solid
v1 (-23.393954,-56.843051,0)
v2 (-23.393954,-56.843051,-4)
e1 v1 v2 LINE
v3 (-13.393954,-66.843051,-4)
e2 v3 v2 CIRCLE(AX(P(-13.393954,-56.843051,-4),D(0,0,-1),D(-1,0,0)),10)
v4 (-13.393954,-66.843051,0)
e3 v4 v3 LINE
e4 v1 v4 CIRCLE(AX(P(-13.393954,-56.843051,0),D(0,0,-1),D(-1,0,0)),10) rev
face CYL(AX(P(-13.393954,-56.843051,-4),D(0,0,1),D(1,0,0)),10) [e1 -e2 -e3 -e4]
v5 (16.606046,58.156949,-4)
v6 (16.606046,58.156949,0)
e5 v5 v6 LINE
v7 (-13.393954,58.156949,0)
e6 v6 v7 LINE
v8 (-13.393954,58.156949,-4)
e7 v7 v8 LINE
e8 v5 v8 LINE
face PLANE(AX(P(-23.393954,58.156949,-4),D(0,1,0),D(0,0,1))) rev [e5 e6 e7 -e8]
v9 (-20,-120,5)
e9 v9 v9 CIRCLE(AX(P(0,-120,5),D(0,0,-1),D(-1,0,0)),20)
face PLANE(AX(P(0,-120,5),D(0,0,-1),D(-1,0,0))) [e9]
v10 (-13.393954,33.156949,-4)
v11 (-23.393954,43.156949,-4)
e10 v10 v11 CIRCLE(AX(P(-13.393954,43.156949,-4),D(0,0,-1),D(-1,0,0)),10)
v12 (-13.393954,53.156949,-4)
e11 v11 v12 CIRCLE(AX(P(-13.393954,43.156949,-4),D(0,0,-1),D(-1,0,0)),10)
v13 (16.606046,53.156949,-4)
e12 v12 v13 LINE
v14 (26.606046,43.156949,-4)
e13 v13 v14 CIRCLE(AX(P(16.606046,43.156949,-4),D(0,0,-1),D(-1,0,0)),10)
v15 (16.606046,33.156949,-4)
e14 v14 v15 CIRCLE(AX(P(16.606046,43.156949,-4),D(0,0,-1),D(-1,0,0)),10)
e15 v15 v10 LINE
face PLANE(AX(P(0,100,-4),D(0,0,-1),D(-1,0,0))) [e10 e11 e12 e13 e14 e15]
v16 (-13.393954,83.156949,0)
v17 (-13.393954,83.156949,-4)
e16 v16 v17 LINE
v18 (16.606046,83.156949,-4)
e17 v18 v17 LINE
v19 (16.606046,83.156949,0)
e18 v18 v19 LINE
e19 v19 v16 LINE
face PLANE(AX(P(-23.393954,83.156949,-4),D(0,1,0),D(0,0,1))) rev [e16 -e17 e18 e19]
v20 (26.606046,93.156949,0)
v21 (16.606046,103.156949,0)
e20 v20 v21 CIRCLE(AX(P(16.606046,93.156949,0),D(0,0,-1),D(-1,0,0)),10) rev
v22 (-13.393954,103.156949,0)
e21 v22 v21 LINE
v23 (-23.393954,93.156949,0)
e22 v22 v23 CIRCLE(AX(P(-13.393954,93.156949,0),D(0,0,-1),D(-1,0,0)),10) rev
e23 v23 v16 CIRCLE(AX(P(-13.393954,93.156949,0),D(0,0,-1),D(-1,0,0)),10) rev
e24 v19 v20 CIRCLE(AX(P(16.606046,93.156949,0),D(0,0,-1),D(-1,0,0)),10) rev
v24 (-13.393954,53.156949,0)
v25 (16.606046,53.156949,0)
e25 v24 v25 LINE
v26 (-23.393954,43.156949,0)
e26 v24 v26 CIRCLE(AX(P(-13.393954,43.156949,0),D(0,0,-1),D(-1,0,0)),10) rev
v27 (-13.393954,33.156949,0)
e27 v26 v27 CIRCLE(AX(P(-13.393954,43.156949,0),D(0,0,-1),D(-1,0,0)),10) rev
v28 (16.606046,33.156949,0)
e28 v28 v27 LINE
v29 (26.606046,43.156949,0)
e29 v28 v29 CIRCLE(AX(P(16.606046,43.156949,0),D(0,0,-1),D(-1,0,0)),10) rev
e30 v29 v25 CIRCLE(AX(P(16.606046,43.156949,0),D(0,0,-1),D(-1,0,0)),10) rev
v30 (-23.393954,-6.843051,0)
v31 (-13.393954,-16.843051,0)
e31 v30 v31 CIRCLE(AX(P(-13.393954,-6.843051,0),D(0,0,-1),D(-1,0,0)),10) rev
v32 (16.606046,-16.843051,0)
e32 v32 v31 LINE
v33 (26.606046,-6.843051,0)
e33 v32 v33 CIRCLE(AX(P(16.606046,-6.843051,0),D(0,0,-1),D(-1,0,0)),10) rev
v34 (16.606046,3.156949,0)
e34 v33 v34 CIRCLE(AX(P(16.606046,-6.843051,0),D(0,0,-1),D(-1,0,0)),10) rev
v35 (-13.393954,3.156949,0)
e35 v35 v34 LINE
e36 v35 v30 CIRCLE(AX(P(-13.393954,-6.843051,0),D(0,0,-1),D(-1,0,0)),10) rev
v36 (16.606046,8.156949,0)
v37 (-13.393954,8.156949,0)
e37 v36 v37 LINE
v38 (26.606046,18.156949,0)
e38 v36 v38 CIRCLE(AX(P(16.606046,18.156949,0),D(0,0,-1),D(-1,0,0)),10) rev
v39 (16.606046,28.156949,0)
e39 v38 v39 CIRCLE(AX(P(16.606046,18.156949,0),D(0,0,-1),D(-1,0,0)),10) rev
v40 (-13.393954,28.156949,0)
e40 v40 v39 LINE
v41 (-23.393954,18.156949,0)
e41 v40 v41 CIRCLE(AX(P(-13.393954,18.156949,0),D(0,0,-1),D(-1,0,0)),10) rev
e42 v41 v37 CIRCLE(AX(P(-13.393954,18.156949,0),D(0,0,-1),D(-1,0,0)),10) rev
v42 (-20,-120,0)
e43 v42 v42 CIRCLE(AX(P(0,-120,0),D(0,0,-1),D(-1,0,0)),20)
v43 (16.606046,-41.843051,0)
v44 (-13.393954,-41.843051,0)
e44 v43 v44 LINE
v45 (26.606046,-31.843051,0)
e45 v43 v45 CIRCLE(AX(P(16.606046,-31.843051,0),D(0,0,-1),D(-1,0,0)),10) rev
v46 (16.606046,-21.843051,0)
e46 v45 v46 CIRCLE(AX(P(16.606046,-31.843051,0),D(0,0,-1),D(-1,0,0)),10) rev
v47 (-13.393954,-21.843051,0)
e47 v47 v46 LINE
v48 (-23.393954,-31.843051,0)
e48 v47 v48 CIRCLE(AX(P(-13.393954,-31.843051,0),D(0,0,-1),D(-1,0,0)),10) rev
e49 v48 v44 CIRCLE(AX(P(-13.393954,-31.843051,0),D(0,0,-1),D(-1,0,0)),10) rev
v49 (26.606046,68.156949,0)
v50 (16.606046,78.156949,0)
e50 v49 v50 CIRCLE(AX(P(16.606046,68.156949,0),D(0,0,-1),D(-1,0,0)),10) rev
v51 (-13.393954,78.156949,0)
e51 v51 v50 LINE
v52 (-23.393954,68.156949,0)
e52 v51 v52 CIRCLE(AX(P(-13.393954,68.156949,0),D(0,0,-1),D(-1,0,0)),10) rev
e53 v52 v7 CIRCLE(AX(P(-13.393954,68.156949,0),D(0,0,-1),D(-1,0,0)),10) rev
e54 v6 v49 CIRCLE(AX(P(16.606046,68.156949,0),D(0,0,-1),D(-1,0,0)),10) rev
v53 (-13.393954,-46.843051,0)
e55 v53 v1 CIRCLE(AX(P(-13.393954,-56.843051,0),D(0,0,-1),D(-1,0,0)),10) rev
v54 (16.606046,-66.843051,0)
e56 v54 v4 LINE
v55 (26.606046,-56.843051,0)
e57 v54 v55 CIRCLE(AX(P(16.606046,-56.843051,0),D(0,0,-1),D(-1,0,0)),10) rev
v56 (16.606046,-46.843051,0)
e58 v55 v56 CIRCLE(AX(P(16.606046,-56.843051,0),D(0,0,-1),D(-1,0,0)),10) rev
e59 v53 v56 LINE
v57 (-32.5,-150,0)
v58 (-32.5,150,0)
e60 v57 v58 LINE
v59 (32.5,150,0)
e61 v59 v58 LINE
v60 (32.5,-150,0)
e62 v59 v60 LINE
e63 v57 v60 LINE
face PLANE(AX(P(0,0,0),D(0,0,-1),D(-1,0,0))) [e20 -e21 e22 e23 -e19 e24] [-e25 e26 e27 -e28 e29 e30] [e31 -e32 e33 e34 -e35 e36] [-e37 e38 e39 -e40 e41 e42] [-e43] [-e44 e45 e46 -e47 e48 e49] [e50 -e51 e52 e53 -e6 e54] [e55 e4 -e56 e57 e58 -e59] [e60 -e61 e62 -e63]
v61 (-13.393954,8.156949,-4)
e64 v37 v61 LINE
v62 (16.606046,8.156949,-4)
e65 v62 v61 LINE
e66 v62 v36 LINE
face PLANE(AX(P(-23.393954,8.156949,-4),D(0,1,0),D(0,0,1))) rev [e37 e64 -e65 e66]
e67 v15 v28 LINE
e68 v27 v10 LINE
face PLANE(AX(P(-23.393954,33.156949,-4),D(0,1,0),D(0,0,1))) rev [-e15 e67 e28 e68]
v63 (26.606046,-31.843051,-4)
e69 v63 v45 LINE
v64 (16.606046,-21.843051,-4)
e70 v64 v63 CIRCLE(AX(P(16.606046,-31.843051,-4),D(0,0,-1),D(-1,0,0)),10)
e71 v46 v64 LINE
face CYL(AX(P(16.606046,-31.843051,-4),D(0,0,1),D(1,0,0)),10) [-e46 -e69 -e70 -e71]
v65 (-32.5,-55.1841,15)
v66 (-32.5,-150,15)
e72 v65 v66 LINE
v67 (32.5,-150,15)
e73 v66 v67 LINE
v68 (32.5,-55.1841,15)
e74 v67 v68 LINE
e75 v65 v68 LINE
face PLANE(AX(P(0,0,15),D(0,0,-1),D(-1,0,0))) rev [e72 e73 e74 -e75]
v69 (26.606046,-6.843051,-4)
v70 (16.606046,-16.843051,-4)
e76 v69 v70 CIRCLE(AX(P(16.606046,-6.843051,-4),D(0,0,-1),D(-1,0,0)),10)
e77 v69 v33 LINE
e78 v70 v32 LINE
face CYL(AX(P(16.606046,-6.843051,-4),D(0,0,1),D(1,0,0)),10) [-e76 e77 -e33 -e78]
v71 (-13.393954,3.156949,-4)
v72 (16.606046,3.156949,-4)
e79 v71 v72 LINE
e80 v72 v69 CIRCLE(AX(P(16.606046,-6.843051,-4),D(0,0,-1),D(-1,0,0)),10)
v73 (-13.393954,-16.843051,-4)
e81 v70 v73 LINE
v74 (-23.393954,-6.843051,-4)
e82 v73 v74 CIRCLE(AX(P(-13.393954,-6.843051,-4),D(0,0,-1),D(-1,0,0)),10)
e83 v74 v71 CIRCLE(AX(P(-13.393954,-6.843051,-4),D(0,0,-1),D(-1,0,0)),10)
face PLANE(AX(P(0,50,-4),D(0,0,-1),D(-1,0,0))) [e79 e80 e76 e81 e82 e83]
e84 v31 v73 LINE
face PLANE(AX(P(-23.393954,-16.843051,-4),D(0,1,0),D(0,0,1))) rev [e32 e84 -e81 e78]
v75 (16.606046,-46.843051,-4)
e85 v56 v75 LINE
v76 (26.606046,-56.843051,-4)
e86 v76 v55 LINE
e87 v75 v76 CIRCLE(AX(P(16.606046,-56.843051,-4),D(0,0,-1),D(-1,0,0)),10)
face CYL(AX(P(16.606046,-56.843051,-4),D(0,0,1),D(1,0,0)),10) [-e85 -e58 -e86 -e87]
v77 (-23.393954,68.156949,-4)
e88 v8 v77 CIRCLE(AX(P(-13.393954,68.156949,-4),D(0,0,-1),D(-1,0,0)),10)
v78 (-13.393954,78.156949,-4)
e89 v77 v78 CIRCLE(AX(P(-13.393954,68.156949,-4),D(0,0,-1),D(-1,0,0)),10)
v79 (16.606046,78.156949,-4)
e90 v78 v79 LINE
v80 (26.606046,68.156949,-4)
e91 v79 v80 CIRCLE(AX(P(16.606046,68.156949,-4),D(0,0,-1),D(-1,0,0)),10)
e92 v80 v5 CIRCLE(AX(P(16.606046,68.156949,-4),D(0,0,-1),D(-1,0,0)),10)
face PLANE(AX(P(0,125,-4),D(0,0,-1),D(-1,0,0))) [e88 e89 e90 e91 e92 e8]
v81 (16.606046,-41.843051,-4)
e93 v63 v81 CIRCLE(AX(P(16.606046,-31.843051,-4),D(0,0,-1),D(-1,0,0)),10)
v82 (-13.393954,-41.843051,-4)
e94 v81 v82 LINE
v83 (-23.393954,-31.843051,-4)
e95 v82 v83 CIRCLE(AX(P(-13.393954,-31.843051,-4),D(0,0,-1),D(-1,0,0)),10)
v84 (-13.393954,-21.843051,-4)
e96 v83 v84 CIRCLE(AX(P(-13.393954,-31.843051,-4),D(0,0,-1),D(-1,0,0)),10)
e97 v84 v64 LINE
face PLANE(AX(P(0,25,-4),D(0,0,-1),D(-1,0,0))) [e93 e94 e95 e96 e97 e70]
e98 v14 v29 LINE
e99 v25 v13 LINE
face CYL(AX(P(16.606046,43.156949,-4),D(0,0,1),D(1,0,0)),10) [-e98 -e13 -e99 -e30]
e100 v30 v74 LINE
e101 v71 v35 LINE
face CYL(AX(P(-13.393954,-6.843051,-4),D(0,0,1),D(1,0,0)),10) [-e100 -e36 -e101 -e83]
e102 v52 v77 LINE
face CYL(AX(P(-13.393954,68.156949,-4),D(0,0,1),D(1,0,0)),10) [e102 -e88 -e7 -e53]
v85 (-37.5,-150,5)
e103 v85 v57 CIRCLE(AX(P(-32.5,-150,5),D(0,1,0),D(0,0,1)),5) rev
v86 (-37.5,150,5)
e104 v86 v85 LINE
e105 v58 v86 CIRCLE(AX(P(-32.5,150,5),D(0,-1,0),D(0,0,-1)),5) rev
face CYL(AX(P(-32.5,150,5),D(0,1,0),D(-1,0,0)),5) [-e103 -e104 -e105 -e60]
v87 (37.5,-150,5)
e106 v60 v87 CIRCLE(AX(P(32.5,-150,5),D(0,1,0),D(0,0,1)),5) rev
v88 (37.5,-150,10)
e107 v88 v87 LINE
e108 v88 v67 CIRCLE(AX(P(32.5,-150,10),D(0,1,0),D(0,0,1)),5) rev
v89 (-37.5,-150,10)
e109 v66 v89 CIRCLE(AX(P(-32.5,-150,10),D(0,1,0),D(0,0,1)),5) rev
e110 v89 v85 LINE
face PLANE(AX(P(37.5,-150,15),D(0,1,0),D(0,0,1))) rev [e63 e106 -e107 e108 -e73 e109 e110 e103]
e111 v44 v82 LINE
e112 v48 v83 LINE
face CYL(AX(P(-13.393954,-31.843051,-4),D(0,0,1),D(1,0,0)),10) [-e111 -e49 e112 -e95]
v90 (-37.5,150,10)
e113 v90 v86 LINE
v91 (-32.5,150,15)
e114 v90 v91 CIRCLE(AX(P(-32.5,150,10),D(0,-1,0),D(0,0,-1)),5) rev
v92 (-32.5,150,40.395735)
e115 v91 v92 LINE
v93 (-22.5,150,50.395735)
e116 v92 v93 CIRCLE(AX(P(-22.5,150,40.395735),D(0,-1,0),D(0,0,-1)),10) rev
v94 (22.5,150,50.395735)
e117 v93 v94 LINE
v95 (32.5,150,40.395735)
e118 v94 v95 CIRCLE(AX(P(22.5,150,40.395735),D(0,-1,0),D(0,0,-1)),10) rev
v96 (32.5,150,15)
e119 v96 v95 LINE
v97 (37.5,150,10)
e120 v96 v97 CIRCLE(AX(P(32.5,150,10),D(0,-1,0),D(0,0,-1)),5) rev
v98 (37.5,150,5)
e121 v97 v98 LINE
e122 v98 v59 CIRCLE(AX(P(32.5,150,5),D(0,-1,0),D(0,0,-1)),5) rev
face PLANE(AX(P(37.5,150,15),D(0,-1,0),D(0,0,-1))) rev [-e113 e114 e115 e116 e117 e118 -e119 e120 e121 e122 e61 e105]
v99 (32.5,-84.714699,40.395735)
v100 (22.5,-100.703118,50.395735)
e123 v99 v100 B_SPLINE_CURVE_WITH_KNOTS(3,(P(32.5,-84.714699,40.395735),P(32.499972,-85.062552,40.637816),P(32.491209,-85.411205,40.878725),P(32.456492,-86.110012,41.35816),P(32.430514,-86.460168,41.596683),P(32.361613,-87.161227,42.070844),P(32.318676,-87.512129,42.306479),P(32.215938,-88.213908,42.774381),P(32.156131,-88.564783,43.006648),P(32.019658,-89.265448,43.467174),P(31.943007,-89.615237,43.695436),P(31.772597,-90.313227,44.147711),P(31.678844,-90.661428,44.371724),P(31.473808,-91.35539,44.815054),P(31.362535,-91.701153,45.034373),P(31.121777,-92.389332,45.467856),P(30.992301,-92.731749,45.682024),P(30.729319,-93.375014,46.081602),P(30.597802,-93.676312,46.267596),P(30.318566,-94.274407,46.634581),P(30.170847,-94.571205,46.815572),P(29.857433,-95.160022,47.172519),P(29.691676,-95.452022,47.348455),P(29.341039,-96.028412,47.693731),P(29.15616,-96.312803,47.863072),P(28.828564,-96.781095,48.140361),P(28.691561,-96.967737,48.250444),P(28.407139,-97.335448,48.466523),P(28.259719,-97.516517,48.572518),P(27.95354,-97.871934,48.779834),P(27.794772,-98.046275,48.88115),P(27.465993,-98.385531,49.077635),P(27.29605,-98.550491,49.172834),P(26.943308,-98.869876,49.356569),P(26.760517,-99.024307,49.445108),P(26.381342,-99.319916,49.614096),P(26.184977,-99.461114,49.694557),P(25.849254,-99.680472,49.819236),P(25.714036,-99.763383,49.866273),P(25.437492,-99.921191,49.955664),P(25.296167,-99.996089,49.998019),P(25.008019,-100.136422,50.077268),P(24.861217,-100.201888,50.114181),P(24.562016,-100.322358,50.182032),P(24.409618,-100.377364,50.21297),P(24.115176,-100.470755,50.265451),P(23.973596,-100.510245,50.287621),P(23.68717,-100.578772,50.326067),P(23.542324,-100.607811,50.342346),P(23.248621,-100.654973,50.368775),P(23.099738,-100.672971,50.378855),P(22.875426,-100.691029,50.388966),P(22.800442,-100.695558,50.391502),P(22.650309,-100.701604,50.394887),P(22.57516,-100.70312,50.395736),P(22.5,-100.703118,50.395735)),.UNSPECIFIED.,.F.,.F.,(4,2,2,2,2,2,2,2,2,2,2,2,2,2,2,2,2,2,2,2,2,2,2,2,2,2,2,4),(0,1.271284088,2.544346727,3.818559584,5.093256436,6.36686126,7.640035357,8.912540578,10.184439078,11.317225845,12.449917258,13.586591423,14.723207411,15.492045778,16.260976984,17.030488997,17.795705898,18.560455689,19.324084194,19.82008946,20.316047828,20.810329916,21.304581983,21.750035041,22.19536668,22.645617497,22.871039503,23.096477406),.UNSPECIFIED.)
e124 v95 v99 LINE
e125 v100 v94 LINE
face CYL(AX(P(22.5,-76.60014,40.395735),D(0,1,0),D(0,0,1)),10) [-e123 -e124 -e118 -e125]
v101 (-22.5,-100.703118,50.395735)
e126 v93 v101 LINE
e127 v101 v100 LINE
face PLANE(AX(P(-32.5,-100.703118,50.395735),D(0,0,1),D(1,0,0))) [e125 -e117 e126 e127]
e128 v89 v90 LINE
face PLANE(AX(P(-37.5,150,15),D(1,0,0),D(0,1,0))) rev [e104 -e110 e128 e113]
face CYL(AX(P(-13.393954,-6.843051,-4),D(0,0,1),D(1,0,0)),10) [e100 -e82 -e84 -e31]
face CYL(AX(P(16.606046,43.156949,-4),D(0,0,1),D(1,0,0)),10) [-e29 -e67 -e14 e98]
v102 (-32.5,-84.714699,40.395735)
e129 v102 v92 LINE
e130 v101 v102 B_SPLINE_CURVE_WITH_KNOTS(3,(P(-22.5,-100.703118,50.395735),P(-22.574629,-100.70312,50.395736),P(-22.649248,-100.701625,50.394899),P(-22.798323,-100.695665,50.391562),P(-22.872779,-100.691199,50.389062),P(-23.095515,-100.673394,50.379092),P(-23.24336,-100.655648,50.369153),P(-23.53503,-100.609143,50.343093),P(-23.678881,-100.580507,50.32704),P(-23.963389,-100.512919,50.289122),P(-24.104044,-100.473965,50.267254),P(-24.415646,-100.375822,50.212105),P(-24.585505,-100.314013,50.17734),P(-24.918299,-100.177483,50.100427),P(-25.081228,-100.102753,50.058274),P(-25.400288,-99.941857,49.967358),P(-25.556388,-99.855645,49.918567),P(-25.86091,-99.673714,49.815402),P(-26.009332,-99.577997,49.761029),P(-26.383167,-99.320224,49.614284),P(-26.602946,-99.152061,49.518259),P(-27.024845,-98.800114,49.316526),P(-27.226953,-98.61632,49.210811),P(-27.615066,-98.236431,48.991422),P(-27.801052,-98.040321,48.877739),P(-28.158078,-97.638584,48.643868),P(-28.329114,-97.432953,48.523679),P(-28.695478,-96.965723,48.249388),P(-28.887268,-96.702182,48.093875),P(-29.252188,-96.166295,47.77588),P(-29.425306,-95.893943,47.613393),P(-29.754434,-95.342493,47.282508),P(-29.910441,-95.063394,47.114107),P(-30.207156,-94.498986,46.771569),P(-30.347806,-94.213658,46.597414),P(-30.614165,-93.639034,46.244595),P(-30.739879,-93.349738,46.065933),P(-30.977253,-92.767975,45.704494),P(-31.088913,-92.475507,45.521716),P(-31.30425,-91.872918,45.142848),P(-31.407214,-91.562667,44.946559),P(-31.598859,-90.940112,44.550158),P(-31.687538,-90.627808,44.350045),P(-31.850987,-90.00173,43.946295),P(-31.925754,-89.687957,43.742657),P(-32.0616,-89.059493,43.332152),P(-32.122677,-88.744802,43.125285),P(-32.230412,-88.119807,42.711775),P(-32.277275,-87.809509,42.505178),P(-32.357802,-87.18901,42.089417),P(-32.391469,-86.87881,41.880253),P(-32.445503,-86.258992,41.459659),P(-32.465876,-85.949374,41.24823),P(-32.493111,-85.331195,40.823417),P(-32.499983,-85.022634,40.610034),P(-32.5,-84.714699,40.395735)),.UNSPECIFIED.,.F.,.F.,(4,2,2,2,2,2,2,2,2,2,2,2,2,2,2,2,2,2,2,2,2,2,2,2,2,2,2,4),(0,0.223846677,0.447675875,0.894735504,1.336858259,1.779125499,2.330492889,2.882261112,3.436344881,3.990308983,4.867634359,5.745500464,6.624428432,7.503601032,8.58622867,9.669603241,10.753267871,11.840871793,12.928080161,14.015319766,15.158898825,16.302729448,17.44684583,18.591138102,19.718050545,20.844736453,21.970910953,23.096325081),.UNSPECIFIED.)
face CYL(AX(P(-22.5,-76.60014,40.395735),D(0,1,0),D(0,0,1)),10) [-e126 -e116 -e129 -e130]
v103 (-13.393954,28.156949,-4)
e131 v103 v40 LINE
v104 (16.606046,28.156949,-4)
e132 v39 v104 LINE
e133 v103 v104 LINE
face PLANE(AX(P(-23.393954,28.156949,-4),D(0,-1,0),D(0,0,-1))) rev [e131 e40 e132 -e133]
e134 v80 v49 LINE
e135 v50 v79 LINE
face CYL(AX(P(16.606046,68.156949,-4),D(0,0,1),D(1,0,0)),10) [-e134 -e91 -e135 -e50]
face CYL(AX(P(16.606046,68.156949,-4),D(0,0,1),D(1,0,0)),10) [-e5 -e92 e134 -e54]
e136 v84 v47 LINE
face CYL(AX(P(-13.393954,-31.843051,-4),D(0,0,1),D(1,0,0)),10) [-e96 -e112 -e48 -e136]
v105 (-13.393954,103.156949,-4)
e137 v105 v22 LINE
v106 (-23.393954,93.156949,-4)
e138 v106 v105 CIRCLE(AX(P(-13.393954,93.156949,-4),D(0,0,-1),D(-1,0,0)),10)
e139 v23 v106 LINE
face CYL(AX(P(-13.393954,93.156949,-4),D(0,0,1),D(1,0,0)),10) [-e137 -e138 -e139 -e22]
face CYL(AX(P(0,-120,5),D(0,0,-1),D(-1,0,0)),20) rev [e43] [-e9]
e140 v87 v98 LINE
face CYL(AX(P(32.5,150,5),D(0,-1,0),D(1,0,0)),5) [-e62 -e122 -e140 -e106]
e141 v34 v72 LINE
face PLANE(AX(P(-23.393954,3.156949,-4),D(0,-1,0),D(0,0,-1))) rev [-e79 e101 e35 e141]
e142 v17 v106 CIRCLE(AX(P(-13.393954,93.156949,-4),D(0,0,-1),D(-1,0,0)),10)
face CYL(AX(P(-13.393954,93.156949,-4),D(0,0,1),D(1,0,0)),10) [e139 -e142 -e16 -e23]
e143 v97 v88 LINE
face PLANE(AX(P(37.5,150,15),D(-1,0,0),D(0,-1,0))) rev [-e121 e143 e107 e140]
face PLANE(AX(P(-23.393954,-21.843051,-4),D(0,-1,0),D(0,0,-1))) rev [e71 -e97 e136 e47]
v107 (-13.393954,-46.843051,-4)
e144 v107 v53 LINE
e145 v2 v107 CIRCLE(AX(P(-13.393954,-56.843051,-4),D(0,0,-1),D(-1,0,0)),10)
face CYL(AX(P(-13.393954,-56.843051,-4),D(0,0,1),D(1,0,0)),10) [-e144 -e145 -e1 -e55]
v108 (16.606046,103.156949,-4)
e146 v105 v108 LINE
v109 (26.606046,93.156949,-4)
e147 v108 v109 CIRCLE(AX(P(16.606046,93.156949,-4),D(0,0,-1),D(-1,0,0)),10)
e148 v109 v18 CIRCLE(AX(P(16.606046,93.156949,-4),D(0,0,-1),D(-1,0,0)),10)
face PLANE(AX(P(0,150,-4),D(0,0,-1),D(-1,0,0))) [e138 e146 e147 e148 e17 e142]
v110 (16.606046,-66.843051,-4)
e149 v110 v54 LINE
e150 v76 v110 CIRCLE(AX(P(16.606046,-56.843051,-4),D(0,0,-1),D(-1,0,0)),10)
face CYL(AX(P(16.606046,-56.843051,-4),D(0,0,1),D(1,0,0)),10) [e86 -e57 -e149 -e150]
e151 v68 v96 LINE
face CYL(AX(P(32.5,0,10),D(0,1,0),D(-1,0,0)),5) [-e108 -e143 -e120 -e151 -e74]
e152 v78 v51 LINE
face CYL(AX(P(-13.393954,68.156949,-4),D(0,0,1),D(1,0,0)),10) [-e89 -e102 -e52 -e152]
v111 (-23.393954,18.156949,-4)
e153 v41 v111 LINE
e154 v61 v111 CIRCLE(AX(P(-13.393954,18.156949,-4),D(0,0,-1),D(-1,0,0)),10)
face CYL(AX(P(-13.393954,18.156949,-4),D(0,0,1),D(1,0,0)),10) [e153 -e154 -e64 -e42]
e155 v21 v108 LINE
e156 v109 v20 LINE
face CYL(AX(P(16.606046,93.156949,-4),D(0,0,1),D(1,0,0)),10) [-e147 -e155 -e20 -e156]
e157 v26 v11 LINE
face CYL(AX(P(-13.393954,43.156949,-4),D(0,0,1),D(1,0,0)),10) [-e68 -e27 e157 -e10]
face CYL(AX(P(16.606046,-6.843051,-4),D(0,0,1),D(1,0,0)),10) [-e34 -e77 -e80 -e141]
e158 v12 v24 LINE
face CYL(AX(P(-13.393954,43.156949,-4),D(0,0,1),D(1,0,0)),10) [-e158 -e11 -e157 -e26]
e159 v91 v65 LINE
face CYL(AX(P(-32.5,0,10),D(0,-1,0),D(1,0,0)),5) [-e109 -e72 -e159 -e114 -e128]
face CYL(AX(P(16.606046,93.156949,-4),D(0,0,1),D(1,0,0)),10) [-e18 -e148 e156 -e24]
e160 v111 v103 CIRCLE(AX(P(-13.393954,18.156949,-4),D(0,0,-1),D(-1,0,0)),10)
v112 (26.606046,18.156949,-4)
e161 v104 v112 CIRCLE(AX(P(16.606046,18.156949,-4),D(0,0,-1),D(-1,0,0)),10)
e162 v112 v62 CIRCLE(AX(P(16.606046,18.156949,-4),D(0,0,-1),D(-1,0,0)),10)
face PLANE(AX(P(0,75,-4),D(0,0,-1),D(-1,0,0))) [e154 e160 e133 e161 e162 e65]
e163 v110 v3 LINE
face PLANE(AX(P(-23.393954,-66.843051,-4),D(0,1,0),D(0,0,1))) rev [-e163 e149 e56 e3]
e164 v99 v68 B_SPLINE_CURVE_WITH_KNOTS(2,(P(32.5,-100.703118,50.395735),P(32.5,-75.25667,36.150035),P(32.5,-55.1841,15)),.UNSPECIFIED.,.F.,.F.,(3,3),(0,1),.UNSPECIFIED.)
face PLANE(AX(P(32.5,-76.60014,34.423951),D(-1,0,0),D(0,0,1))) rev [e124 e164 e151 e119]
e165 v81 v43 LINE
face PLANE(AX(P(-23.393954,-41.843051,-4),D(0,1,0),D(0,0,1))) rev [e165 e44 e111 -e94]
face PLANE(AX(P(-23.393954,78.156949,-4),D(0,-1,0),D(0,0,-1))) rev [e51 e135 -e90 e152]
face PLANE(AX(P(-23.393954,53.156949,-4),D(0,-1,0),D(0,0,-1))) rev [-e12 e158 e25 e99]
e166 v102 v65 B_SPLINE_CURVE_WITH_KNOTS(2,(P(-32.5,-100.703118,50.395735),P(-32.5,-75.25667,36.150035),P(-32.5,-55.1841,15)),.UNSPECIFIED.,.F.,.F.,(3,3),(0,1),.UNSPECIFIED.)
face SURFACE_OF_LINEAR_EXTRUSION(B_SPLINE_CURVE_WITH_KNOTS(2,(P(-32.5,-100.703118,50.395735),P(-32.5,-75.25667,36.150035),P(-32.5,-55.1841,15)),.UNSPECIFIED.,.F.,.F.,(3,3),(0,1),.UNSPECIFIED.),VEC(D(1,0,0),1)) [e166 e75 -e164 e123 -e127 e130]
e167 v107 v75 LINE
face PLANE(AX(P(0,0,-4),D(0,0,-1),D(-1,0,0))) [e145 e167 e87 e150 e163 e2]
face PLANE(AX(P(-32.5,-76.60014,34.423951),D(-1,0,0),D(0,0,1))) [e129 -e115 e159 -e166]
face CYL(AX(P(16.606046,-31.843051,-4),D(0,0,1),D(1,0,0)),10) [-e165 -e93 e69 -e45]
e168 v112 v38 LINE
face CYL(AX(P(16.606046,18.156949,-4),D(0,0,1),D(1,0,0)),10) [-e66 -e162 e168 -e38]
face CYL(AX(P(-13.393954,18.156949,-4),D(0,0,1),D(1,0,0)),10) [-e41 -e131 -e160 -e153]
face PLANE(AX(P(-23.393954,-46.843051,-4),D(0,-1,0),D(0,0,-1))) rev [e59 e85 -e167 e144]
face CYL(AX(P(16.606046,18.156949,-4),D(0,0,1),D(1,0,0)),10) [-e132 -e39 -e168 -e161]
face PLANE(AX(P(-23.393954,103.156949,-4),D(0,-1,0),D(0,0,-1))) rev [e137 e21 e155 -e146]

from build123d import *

# Parameters (mm, degrees)
SKETCH3_W              = 75
SKETCH3_H              = 300
BOSS_EXTRUDE1_DEPTH    = 15
SKETCH4_R              = 20
CUT_EXTRUDE1_DEPTH     = 5
FILLET1_R              = 5
BOSS_EXTRUDE4_DEPTH    = 65
FILLET3_R              = 10
FILLET4_R              = 10
SKETCH12_W             = 50
SKETCH12_H             = 20
BOSS_EXTRUDE5_DEPTH    = 4
FILLET5_R              = 10
LPATTERN3_COUNT        = 7
LPATTERN3_PITCH        = 25
FILLET5_OF_LPATTERN3_R = 10


with BuildPart() as part:
    # Sketch3 → Boss-Extrude1 (new body)
    with BuildSketch(Plane.XY):
        Rectangle(SKETCH3_W, SKETCH3_H)
    extrude(amount=BOSS_EXTRUDE1_DEPTH)

    # Sketch4 → Cut-Extrude1 (cut)
    with BuildSketch(Plane(origin=(0, 0, 0), x_dir=(-1, 0, 0), z_dir=(0, 0, -1))):
        with Locations((0, -120)):
            Circle(SKETCH4_R)
    extrude(amount=-CUT_EXTRUDE1_DEPTH, mode=Mode.SUBTRACT)

    # Fillet1
    fillet1_edges = [part.edges().sort_by_distance(p)[0] for p in [
        (37.5, 0, 15),
        (-37.5, 0, 15),
        (37.5, 0, 0),
        (-37.5, 0, 0),
    ]]
    fillet(fillet1_edges, radius=FILLET1_R)

    # Sketch11 → Boss-Extrude4 (add)
    with BuildSketch(Plane(origin=(32.5, 0, 0), x_dir=(0, 0, -1), z_dir=(1, 0, 0))):
        with BuildLine():
            Line((-15, 150), (-15, -55.184099518))
            add(Edge.make_bspline(
                [(-15, -55.184099518), (-36.150035241, -75.256670259), (-50.395734878, -100.703118223)],
                knots=[0, 0, 0, 1, 1, 1], degree=2))
            Line((-50.395734878, -100.703118223), (-50.395734878, 150))
            Line((-50.395734878, 150), (-15, 150))
        make_face()
    extrude(amount=-BOSS_EXTRUDE4_DEPTH)

    # Fillet3
    fillet3_edges = [part.edges().sort_by_distance(p)[0] for p in [
        (-32.5, 24.648440888, 50.395734878),
    ]]
    fillet(fillet3_edges, radius=FILLET3_R)

    # Fillet4
    fillet4_edges = [part.edges().sort_by_distance(p)[0] for p in [
        (32.5, 24.648440888, 50.395734878),
    ]]
    fillet(fillet4_edges, radius=FILLET4_R)

    # Sketch12 → Boss-Extrude5 (add)
    with BuildSketch(Plane(origin=(0, 0, 0), x_dir=(-1, 0, 0), z_dir=(0, 0, -1))):
        with Locations((-1.606045565, -56.843050926)):
            Rectangle(SKETCH12_W, SKETCH12_H)
    boss_extrude5 = extrude(amount=BOSS_EXTRUDE5_DEPTH)

    # Fillet5
    fillet5_edges = [part.edges().sort_by_distance(p)[0] for p in [
        (-23.393954435, -66.843050926, -2),
        (-23.393954435, -46.843050926, -2),
        (26.606045565, -66.843050926, -2),
        (26.606045565, -46.843050926, -2),
    ]]
    fillet(fillet5_edges, radius=FILLET5_R - 0.0001)  # a hair under: the kernel refuses the full size

    # LPattern3: Boss-Extrude5 ×7
    with Locations(*[(0, i * LPATTERN3_PITCH, 0) for i in range(1, LPATTERN3_COUNT)]):
        add(boss_extrude5)

    # Fillet5 of LPattern3
    fillet5_of_lpattern3_edges = [part.edges().sort_by_distance(p)[0] for p in [
        (-23.393954435, -41.843050926, -2),
        (-23.393954435, -21.843050926, -2),
        (26.606045565, -41.843050926, -2),
        (26.606045565, -21.843050926, -2),
        (-23.393954435, -16.843050926, -2),
        (-23.393954435, 3.156949074, -2),
        (26.606045565, -16.843050926, -2),
        (26.606045565, 3.156949074, -2),
        (-23.393954435, 8.156949074, -2),
        (-23.393954435, 28.156949074, -2),
        (26.606045565, 8.156949074, -2),
        (26.606045565, 28.156949074, -2),
        (-23.393954435, 33.156949074, -2),
        (-23.393954435, 53.156949074, -2),
        (26.606045565, 33.156949074, -2),
        (26.606045565, 53.156949074, -2),
        (-23.393954435, 58.156949074, -2),
        (-23.393954435, 78.156949074, -2),
        (26.606045565, 58.156949074, -2),
        (26.606045565, 78.156949074, -2),
        (-23.393954435, 83.156949074, -2),
        (-23.393954435, 103.156949074, -2),
        (26.606045565, 83.156949074, -2),
        (26.606045565, 103.156949074, -2),
    ]]
    fillet(fillet5_of_lpattern3_edges, radius=FILLET5_OF_LPATTERN3_R - 0.0001)  # a hair under: the kernel refuses the full size


solid = part.part
